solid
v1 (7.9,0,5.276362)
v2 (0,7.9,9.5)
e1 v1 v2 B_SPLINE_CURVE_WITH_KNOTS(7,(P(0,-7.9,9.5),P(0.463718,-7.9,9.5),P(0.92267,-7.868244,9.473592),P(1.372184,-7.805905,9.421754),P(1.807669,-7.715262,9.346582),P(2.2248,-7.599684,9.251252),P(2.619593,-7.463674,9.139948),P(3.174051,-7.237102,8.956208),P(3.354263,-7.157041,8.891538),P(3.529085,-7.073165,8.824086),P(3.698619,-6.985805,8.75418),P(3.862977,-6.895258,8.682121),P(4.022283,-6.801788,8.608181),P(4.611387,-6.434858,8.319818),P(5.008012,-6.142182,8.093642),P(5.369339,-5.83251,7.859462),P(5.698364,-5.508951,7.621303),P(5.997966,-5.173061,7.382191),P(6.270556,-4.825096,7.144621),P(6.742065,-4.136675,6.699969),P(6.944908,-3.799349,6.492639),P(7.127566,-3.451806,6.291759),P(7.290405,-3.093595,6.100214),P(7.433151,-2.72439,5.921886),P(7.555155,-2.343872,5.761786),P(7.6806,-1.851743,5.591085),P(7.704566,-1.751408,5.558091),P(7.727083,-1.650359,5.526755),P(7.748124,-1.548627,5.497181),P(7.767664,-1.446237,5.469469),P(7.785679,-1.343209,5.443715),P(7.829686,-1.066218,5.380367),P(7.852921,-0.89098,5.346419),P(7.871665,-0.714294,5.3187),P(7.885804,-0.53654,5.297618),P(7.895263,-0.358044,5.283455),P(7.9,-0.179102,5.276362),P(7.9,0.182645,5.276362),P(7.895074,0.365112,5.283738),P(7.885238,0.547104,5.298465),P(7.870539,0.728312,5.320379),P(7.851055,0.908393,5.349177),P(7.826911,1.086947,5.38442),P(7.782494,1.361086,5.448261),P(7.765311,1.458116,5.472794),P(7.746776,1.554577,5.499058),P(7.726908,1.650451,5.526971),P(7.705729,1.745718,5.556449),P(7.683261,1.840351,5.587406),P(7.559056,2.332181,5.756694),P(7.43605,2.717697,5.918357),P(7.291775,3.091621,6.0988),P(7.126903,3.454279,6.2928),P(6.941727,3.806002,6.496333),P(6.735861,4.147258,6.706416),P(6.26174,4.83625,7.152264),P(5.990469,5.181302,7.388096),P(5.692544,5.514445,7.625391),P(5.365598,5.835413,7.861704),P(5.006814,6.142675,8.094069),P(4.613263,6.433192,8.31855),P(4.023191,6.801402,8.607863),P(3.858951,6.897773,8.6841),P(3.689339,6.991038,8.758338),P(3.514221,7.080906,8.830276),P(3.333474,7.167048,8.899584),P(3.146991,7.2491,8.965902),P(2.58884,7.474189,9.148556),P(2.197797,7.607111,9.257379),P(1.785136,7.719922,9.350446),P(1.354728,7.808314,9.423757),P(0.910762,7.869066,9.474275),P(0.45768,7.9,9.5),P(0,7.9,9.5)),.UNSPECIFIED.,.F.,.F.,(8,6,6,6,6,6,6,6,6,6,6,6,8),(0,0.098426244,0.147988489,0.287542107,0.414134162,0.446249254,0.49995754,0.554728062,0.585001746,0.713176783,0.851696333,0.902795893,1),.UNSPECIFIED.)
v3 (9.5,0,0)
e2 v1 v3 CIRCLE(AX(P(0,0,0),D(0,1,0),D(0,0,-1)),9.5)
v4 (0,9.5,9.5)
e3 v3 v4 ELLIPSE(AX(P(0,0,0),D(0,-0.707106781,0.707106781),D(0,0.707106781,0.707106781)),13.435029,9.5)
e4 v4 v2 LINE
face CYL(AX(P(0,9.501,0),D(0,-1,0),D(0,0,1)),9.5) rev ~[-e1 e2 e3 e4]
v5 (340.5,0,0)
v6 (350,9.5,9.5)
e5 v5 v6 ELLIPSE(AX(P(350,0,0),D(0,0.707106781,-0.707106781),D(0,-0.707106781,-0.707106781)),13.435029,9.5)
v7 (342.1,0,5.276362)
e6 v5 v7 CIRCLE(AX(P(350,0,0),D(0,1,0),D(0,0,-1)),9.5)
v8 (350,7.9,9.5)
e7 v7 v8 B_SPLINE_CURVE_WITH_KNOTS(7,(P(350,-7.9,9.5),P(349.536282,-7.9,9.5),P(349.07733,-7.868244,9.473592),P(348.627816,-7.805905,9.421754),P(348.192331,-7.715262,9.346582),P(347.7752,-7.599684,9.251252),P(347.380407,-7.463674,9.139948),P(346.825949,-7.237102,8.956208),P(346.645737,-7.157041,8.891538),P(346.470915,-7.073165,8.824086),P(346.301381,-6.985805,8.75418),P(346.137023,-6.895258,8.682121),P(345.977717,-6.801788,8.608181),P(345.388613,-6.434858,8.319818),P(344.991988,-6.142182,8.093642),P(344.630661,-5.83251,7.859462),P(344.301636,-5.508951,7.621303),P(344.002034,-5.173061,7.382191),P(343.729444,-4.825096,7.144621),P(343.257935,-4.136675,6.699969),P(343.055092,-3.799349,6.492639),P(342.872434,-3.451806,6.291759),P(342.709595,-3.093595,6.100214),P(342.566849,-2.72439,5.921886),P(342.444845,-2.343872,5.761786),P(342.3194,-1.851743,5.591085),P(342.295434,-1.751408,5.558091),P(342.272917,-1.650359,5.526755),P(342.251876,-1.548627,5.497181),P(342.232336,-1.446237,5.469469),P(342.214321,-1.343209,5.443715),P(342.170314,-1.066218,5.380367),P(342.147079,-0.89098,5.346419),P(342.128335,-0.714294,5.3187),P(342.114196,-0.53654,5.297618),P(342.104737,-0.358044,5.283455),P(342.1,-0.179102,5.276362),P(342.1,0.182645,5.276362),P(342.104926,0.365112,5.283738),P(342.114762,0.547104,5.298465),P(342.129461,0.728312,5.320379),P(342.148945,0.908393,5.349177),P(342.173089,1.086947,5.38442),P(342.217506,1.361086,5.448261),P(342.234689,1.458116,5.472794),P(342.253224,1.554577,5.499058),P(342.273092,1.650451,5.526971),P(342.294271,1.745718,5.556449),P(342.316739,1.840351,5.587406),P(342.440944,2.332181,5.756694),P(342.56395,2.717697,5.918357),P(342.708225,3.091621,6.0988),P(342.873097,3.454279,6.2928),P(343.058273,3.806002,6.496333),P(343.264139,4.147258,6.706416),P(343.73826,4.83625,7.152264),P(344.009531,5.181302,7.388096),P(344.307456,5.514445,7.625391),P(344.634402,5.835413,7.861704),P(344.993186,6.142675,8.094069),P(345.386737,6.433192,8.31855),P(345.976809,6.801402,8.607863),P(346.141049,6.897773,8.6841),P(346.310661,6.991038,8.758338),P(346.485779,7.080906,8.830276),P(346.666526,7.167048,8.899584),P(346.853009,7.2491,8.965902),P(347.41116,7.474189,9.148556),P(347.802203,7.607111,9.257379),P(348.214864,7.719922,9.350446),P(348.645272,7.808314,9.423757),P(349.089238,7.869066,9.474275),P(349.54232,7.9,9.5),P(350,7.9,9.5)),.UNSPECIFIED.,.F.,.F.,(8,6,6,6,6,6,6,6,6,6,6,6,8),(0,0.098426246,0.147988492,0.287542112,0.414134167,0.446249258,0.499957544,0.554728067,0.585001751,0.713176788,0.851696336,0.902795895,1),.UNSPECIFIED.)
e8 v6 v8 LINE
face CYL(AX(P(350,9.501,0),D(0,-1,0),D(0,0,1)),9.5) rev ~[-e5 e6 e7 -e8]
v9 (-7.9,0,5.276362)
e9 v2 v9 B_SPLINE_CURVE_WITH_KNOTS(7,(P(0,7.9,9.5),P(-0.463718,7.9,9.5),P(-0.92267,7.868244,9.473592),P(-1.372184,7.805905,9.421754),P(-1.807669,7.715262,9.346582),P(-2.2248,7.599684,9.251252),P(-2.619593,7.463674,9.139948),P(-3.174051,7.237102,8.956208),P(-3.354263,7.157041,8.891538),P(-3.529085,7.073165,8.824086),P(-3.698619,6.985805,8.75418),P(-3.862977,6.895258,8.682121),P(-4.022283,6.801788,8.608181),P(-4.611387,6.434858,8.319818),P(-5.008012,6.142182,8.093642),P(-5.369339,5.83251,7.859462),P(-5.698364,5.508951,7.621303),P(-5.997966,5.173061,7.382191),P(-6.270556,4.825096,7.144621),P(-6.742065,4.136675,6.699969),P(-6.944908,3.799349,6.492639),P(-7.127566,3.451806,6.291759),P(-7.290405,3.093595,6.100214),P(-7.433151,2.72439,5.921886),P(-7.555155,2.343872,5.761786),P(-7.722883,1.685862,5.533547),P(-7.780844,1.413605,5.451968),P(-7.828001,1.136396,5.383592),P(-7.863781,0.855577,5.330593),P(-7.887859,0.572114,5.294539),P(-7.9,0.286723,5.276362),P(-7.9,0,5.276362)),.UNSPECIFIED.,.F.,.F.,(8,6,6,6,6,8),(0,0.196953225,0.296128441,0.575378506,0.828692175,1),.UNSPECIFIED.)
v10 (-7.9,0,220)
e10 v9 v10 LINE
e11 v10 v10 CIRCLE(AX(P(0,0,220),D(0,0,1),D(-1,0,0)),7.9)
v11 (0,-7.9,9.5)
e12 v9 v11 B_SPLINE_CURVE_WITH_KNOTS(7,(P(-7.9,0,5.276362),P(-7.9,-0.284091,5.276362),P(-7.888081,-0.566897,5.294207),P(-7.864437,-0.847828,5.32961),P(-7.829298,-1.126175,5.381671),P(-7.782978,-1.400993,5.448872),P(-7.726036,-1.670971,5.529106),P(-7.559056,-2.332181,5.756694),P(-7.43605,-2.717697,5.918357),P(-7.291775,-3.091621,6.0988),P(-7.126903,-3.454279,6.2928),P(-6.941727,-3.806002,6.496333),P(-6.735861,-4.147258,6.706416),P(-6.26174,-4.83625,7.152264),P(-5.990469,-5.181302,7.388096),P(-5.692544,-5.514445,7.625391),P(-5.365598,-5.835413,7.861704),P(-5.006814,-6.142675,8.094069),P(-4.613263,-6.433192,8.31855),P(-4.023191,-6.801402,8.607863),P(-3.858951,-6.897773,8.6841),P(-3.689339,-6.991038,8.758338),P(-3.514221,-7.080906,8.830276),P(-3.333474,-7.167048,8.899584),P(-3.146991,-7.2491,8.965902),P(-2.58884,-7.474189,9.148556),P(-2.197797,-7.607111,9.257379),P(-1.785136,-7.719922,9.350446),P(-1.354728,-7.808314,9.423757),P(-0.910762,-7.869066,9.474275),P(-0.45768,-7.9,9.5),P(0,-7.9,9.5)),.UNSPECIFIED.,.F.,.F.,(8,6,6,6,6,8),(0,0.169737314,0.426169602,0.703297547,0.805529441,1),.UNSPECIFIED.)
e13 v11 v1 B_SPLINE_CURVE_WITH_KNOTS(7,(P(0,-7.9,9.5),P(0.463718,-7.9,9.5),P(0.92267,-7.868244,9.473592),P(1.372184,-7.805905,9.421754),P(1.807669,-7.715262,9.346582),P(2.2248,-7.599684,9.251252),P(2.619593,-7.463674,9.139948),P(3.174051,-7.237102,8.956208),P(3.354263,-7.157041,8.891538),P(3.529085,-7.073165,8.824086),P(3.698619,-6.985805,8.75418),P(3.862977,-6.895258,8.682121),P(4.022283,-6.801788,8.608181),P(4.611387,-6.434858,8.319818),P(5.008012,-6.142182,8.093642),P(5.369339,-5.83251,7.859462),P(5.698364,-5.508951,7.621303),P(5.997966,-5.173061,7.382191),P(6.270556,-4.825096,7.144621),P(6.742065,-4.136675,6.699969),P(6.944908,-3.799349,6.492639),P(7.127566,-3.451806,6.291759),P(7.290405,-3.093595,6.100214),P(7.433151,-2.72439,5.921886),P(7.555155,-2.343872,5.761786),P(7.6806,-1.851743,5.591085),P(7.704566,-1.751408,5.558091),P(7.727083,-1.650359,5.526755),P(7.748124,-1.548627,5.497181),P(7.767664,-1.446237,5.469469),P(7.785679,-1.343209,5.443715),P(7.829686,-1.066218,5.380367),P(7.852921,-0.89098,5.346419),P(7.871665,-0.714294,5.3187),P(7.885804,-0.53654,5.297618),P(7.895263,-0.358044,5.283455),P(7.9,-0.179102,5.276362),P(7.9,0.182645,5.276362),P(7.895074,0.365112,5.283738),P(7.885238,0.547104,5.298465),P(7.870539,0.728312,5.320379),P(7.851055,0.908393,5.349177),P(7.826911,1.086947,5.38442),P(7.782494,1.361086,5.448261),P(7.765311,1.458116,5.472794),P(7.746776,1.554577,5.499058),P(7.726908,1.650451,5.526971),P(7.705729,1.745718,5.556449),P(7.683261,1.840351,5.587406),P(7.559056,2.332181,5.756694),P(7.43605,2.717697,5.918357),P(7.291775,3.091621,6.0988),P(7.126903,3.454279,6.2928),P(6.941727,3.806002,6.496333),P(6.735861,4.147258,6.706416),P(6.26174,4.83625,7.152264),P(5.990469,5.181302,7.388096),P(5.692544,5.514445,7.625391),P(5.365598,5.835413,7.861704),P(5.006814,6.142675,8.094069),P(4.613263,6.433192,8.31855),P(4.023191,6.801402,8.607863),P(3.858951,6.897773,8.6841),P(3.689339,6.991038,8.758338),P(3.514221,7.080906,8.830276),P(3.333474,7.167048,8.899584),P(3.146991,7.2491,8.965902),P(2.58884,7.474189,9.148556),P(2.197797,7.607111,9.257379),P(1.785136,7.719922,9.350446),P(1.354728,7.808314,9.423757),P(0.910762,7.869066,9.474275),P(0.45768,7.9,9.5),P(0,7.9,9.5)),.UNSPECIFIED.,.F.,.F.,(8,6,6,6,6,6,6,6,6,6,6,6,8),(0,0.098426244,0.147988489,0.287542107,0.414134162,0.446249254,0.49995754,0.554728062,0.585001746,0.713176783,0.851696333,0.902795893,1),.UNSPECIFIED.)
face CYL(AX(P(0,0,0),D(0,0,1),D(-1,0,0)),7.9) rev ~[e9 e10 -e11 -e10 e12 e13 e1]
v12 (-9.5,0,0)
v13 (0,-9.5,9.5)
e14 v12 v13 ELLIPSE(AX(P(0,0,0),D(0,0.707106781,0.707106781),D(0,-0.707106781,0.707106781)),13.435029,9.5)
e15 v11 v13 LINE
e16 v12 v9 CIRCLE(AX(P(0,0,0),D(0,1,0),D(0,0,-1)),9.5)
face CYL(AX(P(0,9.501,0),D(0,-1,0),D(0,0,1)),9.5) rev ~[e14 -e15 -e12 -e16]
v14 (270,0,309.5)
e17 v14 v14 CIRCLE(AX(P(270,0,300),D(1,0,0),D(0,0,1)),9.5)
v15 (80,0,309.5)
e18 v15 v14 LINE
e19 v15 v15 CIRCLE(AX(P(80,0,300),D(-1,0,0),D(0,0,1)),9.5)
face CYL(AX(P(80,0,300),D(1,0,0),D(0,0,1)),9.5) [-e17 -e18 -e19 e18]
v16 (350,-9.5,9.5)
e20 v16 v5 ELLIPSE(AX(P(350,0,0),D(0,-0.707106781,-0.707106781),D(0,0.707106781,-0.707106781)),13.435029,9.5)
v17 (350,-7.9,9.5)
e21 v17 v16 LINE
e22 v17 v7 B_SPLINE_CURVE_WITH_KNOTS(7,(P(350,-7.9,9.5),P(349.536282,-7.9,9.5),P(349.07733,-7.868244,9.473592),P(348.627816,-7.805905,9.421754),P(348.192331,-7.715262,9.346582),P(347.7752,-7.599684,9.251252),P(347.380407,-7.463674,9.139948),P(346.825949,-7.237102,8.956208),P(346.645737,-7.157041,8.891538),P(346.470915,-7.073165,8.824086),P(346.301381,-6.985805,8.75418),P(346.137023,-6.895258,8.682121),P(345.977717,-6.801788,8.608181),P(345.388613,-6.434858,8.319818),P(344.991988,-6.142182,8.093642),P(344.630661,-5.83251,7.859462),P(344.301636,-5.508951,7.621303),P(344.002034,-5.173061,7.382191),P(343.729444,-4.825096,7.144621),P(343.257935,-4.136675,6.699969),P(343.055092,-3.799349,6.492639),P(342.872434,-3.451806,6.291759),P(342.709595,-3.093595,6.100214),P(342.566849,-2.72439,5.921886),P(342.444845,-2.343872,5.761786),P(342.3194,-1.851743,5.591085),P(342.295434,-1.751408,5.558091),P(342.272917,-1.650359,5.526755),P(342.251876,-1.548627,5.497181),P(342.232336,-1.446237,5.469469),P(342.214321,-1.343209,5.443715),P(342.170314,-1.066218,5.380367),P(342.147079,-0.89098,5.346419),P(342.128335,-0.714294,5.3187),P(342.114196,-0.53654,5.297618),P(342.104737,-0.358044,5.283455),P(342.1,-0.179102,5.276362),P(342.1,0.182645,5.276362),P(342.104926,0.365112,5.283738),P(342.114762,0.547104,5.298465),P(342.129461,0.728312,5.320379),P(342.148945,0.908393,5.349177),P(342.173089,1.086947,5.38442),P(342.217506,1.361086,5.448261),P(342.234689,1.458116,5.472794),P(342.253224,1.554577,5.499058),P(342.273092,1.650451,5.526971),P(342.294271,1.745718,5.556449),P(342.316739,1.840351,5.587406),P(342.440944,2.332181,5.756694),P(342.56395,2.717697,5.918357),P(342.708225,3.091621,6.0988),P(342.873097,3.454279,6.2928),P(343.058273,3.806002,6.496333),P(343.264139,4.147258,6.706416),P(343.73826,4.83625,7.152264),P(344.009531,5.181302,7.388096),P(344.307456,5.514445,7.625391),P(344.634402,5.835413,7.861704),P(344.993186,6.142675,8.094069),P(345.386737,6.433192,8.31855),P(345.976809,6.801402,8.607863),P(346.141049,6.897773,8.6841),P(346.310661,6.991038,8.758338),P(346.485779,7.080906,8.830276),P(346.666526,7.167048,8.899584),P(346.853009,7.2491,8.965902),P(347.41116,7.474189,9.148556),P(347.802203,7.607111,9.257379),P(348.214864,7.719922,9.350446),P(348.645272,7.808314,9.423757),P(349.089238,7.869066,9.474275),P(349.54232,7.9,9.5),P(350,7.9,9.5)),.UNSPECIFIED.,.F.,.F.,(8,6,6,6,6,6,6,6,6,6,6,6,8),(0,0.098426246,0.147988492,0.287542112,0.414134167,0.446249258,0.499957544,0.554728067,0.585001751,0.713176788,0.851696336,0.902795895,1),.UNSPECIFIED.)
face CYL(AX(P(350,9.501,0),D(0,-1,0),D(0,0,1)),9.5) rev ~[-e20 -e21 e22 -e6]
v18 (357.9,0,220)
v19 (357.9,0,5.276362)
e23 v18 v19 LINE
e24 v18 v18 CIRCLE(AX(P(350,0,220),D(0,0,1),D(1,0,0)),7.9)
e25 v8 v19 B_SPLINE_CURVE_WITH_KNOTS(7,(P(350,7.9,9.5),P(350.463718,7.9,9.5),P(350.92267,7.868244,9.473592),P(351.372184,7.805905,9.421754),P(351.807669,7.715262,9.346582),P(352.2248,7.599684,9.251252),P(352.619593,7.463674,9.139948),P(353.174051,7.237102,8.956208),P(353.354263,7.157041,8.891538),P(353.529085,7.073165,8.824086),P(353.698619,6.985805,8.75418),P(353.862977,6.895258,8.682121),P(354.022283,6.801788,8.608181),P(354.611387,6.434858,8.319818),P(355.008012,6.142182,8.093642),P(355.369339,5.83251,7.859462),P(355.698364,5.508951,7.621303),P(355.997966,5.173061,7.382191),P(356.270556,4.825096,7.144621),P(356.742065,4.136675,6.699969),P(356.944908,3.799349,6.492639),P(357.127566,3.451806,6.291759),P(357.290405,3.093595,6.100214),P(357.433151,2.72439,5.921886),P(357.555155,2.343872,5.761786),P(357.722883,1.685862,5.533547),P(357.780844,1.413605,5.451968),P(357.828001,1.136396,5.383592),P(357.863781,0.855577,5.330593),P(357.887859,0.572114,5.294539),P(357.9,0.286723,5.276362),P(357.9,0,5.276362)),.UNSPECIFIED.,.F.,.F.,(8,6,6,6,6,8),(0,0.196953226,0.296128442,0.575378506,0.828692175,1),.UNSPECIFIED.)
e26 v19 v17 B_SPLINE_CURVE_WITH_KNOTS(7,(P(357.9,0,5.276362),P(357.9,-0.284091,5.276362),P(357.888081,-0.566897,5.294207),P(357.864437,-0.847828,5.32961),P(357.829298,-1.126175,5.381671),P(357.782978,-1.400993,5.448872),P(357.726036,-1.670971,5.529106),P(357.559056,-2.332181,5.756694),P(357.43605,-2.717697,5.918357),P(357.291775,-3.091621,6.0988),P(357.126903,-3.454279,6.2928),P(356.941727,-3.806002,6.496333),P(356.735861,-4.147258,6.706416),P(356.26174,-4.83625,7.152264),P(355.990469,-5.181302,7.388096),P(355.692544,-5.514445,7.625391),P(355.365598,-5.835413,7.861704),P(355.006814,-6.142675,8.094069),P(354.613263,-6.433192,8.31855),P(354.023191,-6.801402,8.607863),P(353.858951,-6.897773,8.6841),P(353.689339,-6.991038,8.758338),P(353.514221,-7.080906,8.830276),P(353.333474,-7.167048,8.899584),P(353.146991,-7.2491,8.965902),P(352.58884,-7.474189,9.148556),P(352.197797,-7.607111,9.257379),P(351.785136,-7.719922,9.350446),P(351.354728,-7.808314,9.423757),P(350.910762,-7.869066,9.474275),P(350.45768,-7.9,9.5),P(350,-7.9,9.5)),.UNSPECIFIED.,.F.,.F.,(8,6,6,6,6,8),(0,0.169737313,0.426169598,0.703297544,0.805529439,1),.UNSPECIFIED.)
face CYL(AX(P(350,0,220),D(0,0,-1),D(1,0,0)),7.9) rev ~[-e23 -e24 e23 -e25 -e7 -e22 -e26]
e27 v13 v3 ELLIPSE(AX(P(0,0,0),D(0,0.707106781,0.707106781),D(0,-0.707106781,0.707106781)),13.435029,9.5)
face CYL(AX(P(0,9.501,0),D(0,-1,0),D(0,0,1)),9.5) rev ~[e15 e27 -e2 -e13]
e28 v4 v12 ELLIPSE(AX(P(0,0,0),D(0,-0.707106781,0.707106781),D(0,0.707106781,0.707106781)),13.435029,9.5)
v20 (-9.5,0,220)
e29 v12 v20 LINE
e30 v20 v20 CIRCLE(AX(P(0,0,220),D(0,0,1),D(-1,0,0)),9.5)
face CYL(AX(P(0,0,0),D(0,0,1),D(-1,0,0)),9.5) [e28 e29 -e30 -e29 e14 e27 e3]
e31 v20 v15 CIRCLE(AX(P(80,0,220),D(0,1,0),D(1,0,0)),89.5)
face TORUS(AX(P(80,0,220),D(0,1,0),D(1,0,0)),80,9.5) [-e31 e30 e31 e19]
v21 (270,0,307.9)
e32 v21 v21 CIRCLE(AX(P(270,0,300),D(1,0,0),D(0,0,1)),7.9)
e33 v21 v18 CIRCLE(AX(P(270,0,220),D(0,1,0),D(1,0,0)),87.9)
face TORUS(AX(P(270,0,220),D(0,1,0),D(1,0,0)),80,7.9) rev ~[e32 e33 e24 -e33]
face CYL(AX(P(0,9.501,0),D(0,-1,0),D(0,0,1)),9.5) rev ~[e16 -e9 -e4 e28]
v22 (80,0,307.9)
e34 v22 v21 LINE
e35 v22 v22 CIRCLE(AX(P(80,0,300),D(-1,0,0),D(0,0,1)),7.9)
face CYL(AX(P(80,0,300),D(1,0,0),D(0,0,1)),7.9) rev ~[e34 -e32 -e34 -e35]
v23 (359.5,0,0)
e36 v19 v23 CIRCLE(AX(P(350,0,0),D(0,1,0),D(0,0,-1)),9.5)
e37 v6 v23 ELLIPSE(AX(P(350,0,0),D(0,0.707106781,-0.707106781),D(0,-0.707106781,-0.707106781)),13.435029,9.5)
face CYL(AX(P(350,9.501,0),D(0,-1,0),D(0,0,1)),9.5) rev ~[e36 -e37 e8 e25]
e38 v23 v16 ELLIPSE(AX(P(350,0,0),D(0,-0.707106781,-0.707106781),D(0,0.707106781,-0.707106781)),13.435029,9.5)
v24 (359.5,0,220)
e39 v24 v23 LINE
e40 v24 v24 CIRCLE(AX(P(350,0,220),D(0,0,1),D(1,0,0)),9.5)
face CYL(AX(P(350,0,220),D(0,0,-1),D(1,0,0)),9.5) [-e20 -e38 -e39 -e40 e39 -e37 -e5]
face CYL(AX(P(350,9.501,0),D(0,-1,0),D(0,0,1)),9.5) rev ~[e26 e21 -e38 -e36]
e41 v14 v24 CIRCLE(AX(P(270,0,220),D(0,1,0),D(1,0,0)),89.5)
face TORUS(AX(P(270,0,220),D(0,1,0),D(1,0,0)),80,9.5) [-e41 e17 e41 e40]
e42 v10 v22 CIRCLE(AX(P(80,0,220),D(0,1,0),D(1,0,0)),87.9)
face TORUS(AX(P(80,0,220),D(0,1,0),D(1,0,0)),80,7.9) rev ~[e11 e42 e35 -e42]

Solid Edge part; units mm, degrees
sketch "Sketch1" plane through (0, 0, 0) normal (0, -1, 0) x (1, 0, 0)
  line L0 (0, 0) -> (0, 220)
  arc A0 (0, 220) -> (80, 300) centre (80, 220) cw
  line L1 (80, 300) -> (270, 300)
  arc A1 (270, 300) -> (350, 220) centre (270, 220) cw
  line L2 (350, 220) -> (350, 0)
  dimension "D1" = 350
  dimension "D2" = 80
  dimension "D3" = 300
sketch "Sketch2" plane through (0, 0, 0) normal (0, 0, -1) x (-1, 0, 0)
  circle A0 centre (0, 0) radius 9.5
  dimension "D1" = 19
sweep "SweptProtrusion_1" add profiles "Sketch2" path "Sketch1"
shell "Thinwall_1" thickness 1.6 removed faces 4 at (6.5233, -6.1433, 0) at (343.4767, -6.1433, 0) at (6.5233, -6.1433, 0) at (343.4767, -6.1433, 0)
hole "Hole_1" at (0, 0, 0) direction (0, -1, 0) diameter 19 end through all both ways yes
hole "Hole1" at (350, 0, 0) direction (0, -1, 0) diameter 19 end through all both ways yes
properties material "Aluminum, 1060"
